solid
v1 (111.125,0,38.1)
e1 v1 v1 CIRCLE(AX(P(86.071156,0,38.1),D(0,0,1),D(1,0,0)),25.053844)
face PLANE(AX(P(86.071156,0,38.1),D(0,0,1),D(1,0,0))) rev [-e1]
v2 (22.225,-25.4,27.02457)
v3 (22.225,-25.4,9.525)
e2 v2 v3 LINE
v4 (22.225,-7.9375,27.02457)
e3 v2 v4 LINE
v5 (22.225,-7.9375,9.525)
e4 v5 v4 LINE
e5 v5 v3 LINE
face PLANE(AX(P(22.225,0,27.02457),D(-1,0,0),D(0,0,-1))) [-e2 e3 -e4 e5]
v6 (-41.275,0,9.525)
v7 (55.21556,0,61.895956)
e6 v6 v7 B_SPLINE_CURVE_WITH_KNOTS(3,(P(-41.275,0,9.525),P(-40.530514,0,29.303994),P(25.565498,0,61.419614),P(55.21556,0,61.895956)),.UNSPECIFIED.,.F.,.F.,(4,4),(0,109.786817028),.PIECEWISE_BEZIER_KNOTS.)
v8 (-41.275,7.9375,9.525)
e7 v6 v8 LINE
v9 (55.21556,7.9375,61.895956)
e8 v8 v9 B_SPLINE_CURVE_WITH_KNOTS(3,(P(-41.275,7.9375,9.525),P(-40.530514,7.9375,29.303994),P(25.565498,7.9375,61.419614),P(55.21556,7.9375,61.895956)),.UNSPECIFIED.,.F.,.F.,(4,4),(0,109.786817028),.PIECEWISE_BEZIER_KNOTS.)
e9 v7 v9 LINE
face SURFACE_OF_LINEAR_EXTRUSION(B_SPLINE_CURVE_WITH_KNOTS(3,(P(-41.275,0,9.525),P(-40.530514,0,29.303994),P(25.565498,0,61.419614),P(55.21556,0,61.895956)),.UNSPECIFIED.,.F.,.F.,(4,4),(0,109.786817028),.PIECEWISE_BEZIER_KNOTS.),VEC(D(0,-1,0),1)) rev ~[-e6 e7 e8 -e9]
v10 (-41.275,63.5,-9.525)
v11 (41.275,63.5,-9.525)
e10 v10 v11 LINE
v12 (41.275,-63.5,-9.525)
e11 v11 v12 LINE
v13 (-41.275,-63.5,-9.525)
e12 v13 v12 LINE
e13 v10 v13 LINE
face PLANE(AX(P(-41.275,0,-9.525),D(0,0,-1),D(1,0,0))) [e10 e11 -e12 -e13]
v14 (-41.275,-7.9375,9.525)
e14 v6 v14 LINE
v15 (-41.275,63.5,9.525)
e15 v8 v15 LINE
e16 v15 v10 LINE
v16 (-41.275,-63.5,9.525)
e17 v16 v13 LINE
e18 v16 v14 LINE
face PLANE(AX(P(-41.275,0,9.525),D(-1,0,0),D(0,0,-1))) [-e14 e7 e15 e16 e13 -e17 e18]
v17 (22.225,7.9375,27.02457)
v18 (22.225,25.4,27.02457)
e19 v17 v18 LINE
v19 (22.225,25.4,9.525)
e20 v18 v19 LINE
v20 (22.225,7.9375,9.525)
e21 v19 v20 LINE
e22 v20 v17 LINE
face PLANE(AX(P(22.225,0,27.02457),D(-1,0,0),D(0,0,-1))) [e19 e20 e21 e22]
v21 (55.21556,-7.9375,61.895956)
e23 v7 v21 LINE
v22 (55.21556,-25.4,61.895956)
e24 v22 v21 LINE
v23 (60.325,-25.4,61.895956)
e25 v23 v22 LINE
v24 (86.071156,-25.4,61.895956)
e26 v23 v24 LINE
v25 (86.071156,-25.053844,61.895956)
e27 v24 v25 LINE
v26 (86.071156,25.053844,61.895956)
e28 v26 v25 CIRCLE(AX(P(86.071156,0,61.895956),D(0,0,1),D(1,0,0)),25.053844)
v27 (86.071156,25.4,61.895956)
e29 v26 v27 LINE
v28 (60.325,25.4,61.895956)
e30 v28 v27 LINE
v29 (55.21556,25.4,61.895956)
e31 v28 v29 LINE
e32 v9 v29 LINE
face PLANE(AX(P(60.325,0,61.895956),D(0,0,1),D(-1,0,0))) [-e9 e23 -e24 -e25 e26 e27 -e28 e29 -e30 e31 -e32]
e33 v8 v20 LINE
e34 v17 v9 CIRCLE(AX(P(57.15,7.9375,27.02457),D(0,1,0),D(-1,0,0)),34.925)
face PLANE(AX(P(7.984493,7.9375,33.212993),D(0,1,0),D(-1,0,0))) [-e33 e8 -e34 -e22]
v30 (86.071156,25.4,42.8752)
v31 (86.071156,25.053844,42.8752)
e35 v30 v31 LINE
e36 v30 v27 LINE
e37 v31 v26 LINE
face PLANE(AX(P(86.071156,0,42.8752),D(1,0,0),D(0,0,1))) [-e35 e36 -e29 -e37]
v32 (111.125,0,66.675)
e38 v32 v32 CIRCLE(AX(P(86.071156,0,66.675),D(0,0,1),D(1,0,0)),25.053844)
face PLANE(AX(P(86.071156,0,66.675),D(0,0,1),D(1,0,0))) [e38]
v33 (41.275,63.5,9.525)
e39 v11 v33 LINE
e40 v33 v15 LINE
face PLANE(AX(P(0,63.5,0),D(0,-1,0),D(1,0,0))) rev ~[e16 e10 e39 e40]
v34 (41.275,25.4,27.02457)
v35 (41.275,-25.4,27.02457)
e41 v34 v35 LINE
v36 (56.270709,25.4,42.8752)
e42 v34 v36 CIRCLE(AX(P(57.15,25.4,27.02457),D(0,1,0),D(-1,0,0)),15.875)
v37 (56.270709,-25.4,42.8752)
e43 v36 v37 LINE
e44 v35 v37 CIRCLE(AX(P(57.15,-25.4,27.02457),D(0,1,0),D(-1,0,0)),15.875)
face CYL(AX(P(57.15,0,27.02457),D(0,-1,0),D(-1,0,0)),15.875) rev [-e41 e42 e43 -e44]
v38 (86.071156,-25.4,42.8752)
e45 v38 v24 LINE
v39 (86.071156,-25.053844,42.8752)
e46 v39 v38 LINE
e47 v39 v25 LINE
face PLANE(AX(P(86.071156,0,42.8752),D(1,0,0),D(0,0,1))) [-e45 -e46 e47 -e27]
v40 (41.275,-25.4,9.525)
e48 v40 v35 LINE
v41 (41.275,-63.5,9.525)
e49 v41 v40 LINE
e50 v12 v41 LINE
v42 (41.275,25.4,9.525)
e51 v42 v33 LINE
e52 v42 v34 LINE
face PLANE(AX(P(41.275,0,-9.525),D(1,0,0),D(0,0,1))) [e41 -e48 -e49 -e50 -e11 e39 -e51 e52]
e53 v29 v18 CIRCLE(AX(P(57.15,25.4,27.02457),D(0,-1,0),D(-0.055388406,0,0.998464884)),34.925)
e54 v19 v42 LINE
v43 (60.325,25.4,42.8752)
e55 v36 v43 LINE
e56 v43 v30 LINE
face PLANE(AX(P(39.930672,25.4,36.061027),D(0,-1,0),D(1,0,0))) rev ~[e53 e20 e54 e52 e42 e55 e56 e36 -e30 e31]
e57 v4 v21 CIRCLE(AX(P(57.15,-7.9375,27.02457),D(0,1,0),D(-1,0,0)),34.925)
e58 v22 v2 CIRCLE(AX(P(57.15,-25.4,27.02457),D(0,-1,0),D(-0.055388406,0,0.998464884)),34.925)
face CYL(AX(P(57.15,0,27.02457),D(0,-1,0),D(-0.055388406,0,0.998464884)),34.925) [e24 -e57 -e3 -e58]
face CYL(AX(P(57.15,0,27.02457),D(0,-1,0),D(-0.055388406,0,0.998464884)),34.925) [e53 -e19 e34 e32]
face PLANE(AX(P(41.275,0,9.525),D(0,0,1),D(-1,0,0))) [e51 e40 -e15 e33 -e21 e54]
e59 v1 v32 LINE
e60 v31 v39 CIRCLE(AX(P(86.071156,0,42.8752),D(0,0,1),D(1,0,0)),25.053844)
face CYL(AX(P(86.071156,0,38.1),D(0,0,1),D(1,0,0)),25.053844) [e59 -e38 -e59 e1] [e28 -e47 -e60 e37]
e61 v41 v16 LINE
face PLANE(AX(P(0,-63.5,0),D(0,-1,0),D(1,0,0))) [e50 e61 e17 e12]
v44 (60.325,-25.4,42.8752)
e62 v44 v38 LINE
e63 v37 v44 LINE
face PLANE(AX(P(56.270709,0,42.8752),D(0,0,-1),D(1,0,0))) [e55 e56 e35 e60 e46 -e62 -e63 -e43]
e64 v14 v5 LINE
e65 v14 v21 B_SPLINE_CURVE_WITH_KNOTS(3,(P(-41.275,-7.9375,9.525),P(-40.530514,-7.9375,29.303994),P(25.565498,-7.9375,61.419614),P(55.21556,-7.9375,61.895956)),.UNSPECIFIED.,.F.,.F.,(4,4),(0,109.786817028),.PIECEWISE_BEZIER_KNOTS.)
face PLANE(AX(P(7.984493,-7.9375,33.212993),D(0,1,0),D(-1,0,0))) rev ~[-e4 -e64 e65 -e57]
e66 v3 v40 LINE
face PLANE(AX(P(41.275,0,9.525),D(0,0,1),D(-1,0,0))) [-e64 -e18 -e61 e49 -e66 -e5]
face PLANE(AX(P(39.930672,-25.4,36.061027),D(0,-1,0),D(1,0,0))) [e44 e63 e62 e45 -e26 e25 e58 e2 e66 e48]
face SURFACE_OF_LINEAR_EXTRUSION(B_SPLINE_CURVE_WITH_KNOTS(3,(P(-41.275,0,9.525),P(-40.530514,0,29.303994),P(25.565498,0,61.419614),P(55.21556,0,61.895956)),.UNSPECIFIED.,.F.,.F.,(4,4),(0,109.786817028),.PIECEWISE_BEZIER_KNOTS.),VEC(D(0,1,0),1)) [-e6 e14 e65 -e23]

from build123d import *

# Parameters (mm, degrees)
F1_DEPTH = 63.5
F0_W     = 25.7461559653
F0_H     = 19.0207560397
F2_DEPTH = 25.4
F3_DEPTH = 7.9375


# Not quite as in the source:
# - a feature names something its author has since deleted; it is built from what else it names


with BuildPart() as f1:
    # F0 (on Front) → F1 (new body, symmetric)
    with BuildSketch(Plane.XZ):
        Polygon((22.225, 9.525), (-41.275, 9.525), (-41.275, -9.525), (41.275, -9.525), (41.275, 9.525), align=None)
    extrude(amount=F1_DEPTH, both=True)

    # F0 (on Front) → F2 (join, symmetric)
    with BuildSketch(Plane.XZ):
        with BuildLine():
            Line((22.225, 27.0245699669), (22.225, 9.525))
            Line((22.225, 9.525), (41.275, 9.525))
            Line((41.275, 9.525), (41.275, 27.0245699669))
            ThreePointArc((41.275, 27.0245699669), (45.6179930488, 37.9345855799), (56.2707090616, 42.8752))
            Line((56.2707090616, 42.8752), (60.325, 42.8752))
            Line((60.325, 42.8752), (60.325, 61.8959560397))
            Line((60.325, 61.8959560397), (55.2155599356, 61.8959560397))
            ThreePointArc((55.2155599356, 61.8959560397), (31.7795847073, 51.0266043156), (22.225, 27.0245699669))
        make_face()
        with Locations((73.1980779827, 52.3855780199)):
            Rectangle(F0_W, F0_H)
    extrude(amount=F2_DEPTH, both=True)

    # F0 (on Front) → F3 (join, symmetric)
    with BuildSketch(Plane.XZ):
        with BuildLine():
            add(Edge.make_bspline(
                [(-41.275, 9.525), (-40.530513972, 29.3039940298), (25.5654975772, 61.4196136594), (55.2155599356, 61.8959560397)],
                knots=[0, 0, 0, 0, 109.7868170282, 109.7868170282, 109.7868170282, 109.7868170282], degree=3))
            Line((-41.275, 9.525), (22.225, 9.525))
            Line((22.225, 9.525), (22.225, 27.0245699669))
            ThreePointArc((22.225, 27.0245699669), (31.7795847073, 51.0266043156), (55.2155599356, 61.8959560397))
        make_face()
    extrude(amount=F3_DEPTH, both=True)

    # F0 (on Front) → F4 (revolve)
    with BuildSketch(Plane.XZ):
        Polygon((86.0711559653, 66.675), (86.0711559653, 61.8959560397), (86.0711559653, 42.8752), (86.0711559653, 38.1), (111.125, 38.1), (111.125, 66.675), align=None)
    revolve(axis=Axis((86.0711559653, 0, 52.3875), (0, 0, 1)))


solid = f1.part
